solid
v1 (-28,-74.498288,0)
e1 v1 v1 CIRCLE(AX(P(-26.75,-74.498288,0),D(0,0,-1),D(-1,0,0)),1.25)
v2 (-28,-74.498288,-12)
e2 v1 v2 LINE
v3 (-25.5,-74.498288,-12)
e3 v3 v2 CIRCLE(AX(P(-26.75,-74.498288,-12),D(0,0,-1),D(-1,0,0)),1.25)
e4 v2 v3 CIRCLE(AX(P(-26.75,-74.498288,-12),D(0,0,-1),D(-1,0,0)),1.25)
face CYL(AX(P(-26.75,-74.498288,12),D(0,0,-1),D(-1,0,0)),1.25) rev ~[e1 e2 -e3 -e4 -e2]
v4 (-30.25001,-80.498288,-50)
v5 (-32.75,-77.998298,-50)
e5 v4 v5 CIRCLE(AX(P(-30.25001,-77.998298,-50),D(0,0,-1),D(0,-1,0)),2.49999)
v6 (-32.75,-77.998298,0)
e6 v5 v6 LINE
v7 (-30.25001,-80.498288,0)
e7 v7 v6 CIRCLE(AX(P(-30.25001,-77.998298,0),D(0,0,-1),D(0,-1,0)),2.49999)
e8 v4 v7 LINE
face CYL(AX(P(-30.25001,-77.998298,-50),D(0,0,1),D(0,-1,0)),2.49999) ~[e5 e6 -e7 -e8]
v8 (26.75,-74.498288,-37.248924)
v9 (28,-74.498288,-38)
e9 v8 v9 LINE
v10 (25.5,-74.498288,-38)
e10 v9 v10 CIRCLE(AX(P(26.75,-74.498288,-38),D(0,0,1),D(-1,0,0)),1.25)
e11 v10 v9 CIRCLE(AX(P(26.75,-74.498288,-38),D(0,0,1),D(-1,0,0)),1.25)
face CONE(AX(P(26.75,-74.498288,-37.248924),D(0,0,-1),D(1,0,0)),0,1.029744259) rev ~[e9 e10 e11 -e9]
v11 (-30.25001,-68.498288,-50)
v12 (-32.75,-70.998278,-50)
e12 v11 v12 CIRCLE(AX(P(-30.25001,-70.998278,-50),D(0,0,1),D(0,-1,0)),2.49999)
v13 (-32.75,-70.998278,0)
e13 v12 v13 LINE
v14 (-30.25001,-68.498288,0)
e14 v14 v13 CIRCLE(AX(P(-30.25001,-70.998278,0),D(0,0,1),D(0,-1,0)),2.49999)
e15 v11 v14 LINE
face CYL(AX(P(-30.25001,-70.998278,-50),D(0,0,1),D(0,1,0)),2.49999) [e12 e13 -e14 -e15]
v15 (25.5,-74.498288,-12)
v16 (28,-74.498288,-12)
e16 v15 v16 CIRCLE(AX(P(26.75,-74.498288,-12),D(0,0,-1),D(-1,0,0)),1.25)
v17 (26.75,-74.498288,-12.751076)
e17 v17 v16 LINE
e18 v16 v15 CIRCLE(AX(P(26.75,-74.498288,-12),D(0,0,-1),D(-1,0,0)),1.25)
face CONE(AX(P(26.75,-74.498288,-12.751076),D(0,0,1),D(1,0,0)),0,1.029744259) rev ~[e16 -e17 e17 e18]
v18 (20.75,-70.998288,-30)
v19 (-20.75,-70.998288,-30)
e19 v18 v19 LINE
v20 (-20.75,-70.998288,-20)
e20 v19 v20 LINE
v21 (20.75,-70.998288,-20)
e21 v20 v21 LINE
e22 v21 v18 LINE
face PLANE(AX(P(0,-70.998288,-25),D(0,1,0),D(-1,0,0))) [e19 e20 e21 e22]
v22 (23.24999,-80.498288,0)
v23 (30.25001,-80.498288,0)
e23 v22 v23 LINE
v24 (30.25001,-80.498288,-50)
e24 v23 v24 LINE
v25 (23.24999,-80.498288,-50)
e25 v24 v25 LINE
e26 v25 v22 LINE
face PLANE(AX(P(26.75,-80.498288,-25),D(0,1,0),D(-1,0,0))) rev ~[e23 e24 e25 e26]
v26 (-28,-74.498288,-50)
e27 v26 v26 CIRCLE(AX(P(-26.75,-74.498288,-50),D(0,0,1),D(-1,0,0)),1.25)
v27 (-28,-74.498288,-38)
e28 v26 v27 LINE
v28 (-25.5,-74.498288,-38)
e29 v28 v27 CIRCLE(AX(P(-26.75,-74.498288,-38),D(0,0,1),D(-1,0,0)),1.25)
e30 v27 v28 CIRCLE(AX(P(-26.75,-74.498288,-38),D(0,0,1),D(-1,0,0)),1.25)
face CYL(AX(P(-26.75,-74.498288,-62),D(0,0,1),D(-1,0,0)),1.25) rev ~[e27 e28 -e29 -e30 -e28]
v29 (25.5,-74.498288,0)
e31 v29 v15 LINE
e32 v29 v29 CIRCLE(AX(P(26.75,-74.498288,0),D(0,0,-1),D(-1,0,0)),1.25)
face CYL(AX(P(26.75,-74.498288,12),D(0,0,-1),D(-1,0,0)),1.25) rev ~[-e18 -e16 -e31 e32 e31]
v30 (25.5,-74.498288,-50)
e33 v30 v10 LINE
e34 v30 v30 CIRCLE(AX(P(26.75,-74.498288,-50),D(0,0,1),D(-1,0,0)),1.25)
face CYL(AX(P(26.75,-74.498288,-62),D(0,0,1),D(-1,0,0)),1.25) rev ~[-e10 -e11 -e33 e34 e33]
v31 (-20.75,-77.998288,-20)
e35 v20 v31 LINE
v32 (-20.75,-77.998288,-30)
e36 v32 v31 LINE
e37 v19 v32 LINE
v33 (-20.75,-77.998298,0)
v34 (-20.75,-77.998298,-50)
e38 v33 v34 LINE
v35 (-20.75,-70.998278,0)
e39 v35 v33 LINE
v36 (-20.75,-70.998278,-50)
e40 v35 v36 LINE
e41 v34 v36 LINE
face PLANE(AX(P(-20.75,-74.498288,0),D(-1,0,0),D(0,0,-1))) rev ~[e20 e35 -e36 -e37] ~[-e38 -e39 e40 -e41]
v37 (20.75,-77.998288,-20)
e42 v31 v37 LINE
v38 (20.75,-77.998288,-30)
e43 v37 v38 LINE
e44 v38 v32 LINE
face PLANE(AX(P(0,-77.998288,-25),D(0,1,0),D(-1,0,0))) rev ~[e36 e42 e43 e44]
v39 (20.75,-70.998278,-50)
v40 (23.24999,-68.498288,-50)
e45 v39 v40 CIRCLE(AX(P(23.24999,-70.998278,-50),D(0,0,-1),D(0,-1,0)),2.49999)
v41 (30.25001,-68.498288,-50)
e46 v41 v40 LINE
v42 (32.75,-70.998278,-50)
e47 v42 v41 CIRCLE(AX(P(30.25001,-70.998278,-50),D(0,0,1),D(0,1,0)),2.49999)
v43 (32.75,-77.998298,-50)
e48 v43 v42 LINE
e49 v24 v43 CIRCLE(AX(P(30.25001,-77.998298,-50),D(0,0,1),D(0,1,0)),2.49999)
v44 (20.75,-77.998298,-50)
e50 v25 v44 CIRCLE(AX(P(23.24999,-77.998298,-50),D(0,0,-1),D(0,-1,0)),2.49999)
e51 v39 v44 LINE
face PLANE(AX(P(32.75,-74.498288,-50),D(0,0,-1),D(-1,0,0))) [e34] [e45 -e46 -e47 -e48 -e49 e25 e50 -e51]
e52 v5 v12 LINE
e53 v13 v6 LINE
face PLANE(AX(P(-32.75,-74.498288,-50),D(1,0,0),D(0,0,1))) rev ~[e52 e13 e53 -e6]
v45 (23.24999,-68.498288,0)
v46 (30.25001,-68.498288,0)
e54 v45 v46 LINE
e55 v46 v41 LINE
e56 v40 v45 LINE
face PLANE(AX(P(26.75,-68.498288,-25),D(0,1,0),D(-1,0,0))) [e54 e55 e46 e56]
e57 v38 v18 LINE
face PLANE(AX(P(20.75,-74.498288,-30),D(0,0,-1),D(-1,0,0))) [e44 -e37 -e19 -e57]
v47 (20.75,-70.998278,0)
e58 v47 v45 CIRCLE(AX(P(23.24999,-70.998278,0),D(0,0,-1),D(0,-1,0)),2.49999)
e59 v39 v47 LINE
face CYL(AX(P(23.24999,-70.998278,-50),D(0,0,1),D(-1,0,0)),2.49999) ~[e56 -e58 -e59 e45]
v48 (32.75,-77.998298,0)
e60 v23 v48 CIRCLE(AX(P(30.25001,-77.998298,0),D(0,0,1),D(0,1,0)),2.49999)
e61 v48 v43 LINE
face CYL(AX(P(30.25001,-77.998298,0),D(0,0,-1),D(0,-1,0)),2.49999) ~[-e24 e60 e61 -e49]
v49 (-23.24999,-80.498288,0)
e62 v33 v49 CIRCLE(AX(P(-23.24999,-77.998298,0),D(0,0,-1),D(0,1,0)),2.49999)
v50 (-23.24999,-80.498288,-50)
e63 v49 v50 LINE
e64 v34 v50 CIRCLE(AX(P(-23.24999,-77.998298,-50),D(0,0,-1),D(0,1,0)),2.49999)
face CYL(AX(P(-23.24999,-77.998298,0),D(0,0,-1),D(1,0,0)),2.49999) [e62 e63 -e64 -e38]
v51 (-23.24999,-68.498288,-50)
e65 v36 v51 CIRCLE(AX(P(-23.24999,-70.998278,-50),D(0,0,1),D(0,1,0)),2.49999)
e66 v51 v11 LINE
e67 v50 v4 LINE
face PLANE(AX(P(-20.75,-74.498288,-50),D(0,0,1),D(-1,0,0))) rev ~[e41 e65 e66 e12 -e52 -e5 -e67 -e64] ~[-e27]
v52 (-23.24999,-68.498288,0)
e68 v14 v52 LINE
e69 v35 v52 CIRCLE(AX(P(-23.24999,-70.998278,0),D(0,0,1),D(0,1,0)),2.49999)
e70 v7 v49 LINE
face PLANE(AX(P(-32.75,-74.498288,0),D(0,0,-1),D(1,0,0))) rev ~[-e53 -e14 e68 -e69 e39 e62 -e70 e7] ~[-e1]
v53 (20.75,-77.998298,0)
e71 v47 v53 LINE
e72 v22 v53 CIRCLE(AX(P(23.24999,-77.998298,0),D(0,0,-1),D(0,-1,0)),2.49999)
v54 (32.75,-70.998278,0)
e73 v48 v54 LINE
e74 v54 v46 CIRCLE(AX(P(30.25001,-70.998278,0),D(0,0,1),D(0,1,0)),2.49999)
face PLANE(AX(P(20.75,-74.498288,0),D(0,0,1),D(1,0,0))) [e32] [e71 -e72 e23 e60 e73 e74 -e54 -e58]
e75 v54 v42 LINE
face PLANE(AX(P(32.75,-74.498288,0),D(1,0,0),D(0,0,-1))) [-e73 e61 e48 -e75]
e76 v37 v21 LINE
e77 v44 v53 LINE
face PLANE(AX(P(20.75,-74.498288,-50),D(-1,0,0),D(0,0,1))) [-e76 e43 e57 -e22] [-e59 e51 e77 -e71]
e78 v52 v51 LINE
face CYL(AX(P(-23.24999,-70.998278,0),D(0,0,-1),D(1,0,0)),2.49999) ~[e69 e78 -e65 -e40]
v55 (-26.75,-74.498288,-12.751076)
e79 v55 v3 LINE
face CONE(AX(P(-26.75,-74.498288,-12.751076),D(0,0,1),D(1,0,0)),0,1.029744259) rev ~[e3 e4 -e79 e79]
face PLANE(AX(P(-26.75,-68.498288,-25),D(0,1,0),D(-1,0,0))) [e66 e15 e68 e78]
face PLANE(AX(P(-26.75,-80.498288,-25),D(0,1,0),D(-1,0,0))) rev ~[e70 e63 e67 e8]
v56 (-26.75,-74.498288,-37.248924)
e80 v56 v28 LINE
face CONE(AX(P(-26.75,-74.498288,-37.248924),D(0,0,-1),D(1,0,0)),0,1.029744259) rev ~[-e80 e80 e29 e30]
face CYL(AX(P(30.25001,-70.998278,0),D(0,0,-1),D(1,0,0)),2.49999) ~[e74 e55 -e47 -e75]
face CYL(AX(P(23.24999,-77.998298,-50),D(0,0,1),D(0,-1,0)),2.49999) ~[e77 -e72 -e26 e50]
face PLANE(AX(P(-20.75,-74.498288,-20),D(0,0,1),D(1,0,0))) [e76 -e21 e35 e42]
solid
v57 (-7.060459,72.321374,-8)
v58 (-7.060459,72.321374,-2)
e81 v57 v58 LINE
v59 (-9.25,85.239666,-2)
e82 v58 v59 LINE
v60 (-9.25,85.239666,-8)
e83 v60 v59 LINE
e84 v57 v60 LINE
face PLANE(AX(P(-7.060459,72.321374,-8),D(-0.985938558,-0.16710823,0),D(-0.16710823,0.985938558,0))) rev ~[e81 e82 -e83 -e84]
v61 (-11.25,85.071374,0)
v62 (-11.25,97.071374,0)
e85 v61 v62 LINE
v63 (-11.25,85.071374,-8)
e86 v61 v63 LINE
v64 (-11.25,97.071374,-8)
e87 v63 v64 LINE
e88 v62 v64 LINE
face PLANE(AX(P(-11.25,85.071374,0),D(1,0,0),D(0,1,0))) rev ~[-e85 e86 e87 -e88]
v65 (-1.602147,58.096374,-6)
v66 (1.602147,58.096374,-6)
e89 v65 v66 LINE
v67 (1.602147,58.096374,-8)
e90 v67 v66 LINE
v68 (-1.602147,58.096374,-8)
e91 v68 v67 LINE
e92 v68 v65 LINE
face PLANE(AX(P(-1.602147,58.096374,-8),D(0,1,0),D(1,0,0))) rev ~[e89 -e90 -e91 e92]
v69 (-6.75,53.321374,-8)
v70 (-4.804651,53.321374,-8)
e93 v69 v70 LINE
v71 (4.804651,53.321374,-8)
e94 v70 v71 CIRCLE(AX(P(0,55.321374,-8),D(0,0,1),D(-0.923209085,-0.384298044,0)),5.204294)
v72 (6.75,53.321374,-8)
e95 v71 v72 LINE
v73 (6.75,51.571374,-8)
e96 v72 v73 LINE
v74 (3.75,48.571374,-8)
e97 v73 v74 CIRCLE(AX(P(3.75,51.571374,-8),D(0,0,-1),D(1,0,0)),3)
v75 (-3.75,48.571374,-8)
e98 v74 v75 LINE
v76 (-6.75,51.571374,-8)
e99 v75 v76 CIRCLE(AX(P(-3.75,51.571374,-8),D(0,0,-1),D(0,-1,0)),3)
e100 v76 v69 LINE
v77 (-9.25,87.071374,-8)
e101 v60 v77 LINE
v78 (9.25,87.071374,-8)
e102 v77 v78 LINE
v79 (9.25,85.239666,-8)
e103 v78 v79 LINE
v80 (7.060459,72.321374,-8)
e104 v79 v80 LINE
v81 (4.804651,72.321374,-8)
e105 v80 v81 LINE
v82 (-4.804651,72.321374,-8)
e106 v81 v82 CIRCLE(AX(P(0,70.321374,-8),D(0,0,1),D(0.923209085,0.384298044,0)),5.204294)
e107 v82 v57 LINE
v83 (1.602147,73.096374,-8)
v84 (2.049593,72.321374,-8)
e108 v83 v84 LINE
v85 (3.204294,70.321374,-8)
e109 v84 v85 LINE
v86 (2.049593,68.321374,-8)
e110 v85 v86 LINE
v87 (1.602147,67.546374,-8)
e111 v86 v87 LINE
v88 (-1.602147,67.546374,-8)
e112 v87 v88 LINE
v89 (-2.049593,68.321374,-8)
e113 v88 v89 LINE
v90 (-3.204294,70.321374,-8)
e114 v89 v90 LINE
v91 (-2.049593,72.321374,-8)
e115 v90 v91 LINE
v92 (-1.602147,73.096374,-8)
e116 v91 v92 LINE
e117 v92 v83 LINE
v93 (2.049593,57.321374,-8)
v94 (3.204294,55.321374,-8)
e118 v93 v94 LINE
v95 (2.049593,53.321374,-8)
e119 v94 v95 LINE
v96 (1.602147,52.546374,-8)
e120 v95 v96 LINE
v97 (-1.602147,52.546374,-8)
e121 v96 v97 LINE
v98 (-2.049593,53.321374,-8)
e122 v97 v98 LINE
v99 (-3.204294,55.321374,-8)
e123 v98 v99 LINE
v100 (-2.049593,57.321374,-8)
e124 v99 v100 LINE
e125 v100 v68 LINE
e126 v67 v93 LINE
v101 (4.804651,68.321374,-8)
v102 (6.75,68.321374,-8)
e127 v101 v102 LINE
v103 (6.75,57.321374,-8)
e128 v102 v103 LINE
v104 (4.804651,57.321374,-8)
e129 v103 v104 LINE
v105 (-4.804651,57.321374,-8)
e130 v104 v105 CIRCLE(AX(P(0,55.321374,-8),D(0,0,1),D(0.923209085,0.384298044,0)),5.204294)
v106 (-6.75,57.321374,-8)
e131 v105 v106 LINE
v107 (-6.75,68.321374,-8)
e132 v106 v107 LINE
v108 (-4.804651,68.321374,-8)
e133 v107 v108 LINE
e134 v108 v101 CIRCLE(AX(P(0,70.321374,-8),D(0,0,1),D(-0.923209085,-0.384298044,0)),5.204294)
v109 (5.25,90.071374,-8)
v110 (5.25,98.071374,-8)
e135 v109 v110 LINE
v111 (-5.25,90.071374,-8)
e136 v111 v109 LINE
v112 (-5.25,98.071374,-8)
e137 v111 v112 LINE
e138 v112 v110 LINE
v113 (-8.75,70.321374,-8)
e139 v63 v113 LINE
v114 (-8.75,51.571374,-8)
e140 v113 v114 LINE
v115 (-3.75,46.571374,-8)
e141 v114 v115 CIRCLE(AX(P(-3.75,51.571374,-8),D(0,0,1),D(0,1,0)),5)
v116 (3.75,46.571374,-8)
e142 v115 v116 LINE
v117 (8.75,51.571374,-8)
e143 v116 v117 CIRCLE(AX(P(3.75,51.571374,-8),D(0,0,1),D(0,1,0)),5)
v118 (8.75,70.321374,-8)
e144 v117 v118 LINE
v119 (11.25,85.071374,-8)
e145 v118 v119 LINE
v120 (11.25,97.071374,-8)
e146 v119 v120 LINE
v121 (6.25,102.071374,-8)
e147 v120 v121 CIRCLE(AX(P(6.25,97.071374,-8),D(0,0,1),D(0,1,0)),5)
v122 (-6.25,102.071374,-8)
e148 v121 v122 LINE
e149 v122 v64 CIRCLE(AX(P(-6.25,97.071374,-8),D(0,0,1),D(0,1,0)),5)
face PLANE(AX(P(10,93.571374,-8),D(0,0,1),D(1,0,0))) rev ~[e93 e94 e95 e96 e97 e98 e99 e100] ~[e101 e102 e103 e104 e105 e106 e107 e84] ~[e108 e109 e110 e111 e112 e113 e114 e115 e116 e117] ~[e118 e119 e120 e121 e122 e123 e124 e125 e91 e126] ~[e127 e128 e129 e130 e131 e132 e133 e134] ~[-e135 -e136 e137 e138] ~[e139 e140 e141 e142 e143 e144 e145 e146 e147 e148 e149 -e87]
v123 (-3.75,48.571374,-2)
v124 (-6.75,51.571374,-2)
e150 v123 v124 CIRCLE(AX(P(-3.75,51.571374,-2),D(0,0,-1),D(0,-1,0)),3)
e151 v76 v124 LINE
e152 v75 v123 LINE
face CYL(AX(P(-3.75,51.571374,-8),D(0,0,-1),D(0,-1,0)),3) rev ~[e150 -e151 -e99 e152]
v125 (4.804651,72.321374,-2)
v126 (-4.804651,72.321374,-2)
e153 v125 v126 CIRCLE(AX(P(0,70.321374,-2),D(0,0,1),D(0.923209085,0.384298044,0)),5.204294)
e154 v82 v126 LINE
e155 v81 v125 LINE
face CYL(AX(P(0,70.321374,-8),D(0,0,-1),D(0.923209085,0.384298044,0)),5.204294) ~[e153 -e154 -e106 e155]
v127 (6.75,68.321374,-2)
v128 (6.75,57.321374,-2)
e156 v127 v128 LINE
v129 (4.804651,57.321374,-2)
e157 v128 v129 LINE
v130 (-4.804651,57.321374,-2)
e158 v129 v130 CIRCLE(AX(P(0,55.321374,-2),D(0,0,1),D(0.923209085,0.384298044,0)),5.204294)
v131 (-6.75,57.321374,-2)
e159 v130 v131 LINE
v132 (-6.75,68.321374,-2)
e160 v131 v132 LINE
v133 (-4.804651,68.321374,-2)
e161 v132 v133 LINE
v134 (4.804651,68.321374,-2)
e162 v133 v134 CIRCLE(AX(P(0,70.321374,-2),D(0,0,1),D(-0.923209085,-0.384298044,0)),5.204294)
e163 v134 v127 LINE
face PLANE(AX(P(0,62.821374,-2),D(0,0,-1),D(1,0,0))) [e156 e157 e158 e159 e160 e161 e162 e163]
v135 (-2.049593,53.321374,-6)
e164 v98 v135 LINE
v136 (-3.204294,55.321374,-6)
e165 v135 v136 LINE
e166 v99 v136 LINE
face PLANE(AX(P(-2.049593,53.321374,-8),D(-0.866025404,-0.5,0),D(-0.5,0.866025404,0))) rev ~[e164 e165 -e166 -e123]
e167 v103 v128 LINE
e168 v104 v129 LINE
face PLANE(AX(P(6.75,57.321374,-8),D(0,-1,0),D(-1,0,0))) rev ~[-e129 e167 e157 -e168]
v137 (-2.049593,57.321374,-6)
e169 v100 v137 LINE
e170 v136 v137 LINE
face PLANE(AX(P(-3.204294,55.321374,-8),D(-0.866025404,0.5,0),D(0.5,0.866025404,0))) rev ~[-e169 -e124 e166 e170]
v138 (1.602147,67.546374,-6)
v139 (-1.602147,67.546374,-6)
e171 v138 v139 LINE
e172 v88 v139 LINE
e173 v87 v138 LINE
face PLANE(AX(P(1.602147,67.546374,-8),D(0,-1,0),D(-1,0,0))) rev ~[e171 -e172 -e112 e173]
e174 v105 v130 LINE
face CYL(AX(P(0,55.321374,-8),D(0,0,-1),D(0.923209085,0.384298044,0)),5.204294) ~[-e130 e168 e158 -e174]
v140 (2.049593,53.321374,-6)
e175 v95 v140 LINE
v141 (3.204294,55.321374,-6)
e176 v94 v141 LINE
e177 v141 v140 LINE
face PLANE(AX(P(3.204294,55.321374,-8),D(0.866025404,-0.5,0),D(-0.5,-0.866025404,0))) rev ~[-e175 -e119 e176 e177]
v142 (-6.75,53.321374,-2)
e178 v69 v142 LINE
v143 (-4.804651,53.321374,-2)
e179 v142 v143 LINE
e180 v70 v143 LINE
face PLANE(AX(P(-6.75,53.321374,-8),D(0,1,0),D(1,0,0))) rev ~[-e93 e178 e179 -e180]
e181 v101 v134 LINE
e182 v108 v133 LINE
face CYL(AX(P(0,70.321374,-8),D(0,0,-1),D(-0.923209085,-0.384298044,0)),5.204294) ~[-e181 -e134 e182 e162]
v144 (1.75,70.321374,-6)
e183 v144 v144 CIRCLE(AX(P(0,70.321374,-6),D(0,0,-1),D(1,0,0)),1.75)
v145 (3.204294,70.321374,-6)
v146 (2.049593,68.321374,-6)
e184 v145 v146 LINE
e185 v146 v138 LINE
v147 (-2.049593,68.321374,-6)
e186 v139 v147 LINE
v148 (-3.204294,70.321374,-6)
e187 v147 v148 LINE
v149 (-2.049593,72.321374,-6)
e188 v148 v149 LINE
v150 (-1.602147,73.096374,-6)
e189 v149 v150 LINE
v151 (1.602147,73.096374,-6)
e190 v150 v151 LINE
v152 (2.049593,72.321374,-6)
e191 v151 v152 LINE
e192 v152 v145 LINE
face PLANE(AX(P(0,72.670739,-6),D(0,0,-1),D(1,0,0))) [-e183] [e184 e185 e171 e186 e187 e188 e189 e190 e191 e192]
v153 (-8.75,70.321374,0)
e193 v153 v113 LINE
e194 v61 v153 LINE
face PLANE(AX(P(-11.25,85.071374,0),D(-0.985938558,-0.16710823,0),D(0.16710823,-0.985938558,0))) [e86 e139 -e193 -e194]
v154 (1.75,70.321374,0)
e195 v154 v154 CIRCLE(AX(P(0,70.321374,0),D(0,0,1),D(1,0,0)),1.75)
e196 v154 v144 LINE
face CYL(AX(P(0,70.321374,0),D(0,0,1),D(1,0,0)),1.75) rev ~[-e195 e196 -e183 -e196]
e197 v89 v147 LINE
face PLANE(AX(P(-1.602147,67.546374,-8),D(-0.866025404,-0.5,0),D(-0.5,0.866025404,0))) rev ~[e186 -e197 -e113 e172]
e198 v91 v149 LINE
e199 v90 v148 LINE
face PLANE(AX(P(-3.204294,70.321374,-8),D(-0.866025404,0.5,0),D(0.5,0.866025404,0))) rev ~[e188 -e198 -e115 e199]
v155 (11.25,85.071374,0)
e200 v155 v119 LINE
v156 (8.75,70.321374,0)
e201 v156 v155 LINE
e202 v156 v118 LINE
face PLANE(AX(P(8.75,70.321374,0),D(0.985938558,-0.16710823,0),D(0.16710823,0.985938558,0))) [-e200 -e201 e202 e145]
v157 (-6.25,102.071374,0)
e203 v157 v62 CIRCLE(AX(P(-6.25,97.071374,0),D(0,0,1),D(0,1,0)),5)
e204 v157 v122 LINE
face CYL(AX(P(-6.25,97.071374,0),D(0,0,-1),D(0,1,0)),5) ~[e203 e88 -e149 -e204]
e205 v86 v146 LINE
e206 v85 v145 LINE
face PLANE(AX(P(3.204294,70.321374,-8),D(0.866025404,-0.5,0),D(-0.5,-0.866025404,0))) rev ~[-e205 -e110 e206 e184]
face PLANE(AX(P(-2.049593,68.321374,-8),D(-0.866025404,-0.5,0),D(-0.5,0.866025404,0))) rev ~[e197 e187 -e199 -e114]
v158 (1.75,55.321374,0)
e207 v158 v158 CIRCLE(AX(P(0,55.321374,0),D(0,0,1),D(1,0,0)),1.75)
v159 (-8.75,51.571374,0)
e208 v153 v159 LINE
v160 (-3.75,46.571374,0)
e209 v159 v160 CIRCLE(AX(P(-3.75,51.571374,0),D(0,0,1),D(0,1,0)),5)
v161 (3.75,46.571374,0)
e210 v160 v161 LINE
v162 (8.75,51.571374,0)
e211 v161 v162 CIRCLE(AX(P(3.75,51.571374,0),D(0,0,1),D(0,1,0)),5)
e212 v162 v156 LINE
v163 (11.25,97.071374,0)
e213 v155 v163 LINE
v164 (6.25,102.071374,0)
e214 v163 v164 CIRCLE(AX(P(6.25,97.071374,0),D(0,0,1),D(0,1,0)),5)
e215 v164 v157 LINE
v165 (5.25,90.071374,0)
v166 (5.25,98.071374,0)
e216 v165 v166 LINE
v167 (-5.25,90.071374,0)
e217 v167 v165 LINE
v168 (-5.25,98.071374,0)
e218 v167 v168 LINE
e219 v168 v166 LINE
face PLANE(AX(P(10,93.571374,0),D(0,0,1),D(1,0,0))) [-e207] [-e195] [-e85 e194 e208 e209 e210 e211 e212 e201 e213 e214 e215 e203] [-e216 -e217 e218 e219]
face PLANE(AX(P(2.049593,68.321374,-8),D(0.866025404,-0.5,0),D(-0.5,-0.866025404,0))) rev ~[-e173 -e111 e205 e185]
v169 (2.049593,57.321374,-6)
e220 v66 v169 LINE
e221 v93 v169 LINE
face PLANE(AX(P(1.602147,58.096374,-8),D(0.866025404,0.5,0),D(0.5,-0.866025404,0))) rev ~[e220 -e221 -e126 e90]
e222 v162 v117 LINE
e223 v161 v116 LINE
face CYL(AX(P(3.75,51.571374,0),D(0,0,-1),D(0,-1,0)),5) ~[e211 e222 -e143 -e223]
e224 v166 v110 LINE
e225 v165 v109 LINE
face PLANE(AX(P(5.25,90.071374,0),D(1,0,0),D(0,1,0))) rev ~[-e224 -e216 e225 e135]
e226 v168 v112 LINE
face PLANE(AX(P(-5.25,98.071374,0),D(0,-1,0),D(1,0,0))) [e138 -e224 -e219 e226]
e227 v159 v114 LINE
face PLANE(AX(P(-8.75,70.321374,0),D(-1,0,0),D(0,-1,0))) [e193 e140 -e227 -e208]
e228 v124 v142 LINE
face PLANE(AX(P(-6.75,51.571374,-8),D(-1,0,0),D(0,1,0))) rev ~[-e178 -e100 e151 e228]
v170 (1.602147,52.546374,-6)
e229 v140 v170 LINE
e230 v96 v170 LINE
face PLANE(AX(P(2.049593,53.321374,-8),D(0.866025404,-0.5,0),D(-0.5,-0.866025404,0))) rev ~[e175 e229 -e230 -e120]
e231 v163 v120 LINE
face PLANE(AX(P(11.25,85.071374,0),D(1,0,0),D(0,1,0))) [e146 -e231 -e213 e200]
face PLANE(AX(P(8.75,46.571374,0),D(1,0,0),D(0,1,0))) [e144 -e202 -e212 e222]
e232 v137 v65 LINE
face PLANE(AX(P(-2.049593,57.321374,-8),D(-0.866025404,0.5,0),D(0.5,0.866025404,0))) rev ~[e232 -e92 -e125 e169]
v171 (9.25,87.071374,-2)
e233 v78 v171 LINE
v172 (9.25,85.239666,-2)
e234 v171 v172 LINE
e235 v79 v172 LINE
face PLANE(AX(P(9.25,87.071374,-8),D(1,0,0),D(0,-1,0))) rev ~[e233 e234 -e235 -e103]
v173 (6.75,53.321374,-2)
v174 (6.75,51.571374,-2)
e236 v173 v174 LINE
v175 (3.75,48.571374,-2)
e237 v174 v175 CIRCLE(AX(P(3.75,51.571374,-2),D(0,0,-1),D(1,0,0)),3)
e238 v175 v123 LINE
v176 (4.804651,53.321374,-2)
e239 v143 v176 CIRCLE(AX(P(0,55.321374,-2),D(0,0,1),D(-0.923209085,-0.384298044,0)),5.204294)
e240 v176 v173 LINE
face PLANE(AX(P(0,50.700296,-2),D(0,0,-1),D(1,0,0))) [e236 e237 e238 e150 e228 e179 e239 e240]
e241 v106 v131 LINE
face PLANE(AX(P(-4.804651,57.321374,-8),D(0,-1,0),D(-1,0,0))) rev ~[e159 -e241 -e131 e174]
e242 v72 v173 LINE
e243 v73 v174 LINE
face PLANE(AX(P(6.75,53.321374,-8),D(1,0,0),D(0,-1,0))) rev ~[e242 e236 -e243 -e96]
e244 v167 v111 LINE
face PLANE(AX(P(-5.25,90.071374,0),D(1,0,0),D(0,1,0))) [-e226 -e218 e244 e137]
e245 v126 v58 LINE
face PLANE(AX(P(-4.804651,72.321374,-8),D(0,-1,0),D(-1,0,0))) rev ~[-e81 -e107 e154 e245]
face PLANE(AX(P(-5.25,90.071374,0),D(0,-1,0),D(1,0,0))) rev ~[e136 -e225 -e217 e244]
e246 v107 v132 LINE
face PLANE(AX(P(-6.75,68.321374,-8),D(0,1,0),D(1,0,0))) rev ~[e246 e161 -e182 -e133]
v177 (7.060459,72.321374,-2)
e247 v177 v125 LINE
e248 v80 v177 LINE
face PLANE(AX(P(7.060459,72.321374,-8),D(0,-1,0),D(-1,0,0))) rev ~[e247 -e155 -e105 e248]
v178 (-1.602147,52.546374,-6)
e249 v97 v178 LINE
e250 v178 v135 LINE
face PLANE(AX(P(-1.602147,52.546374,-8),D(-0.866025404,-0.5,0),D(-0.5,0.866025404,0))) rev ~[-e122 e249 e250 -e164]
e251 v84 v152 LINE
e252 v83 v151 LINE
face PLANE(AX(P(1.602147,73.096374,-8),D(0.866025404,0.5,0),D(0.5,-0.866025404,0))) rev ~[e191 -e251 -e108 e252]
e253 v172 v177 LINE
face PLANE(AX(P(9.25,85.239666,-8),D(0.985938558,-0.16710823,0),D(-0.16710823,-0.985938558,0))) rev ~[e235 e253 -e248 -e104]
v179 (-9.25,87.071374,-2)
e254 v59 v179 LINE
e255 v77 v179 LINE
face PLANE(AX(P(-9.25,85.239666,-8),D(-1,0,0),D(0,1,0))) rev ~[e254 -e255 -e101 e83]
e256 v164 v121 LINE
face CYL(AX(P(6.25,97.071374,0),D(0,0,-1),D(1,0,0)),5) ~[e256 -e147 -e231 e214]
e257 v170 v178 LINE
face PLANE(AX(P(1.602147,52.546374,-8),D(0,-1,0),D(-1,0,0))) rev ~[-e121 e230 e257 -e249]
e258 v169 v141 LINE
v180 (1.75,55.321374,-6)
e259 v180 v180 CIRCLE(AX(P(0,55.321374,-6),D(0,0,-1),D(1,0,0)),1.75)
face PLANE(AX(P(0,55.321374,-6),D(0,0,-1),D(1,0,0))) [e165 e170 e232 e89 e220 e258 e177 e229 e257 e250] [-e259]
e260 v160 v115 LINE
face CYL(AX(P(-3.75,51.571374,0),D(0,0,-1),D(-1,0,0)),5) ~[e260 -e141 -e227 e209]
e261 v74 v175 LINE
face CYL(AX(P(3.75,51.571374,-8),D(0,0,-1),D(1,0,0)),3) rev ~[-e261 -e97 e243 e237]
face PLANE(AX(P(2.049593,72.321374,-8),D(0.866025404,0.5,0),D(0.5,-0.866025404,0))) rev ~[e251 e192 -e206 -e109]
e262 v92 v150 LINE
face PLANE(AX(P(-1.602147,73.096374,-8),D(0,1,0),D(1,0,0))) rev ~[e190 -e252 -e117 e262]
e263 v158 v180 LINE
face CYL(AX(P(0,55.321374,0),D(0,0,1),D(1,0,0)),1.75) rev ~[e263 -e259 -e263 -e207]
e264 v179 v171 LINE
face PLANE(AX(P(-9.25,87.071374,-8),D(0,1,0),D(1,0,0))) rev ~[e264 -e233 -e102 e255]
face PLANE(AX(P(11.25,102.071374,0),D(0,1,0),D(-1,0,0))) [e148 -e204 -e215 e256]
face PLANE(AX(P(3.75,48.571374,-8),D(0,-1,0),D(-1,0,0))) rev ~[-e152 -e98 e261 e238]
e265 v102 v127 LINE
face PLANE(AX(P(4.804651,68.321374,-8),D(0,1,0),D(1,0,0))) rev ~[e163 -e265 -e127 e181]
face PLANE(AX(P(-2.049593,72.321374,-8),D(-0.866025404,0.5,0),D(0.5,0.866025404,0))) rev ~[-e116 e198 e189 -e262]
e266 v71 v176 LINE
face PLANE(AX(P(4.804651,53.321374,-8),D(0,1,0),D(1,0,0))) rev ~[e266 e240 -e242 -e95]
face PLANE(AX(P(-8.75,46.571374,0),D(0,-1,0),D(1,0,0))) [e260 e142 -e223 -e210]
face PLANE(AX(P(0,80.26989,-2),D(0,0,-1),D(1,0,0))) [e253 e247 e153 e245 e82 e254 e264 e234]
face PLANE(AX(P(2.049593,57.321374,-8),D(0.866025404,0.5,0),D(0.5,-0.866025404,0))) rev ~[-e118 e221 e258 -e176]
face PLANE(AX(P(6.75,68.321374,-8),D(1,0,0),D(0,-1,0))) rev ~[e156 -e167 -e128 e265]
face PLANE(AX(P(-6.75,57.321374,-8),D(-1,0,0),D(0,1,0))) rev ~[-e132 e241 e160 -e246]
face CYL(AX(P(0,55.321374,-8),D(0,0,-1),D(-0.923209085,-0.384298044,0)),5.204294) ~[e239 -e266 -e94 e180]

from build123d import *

# Parameters (mm, degrees)
F7_W      = 2.5
F7_H      = 17
F7_W_2    = 17.5
F7_W_3    = 10.5
F7_H_2    = 8
F7_R      = 1.75
F8_DEPTH  = 8
F9_R      = 5
F11_DEPTH = 6
F10_R     = 1.75
F12_DEPTH = 2
F15_DEPTH = 3.5
F16_DEPTH = 6
F18_D     = 2.5
F18_DEPTH = 12
F18_TIP   = 0.7510757738
F20_D     = 2.5
F20_DEPTH = 12
F20_TIP   = 0.7510757738
F21_R     = 2.49999


# Not quite as in the source:
# - a fillet or chamfer is up to 0.001 mm smaller than in the source, because OpenCascade refuses the exact size


with BuildPart() as f8:
    # F7 (on Top) → F8 (new body)
    with BuildSketch(Plane.XY):
        with Locations((10, 93.5713741661)):
            Rectangle(F7_W, F7_H)
        with Locations((0, 93.5713741661)):
            Rectangle(F7_W_2, F7_H)
        with Locations((0, 94.0713741661)):
            Rectangle(F7_W_3, F7_H_2, mode=Mode.SUBTRACT)
        with Locations((-10, 93.5713741661)):
            Rectangle(F7_W, F7_H)
        Polygon((-11.25, 85.0713741661), (-8.75, 70.3213741661), (-8.75, 85.0713741661), align=None)
        Polygon((-8.75, 46.5713741661), (8.75, 46.5713741661), (8.75, 70.3213741661), (8.75, 85.0713741661), (-8.75, 85.0713741661), (-8.75, 70.3213741661), align=None)
        with Locations((0, 55.3213741661)):
            Circle(F7_R, mode=Mode.SUBTRACT)
        with Locations((0, 70.3213741661)):
            Circle(F7_R, mode=Mode.SUBTRACT)
        Polygon((8.75, 85.0713741661), (8.75, 70.3213741661), (11.25, 85.0713741661), align=None)
    extrude(amount=-F8_DEPTH)

    # F9
    f9_edges = [f8.edges().sort_by_distance(p)[0] for p in [
        (11.25, 102.071374, -4),
        (8.75, 46.571374, -4),
        (-8.75, 46.571374, -4),
        (-11.25, 102.071374, -4),
    ]]
    fillet(f9_edges, radius=F9_R)

    # F10 (on face) → F11 (cut)
    with BuildSketch(Plane(origin=(0, 0, -8), x_dir=(1, 0, 0), z_dir=(0, 0, -1))):
        with BuildLine():
            Line((6.75, -57.3213741661), (4.8046514937, -57.3213741661))
            ThreePointArc((4.8046514937, -57.3213741661), (0, -60.5256681601), (-4.8046514937, -57.3213741661))
            Line((-4.8046514937, -57.3213741661), (-6.75, -57.3213741661))
            Line((-6.75, -57.3213741661), (-6.75, -68.3213741661))
            Line((-6.75, -68.3213741661), (-4.8046514937, -68.3213741661))
            ThreePointArc((-4.8046514937, -68.3213741661), (0, -65.1170801721), (4.8046514937, -68.3213741661))
            Line((4.8046514937, -68.3213741661), (6.75, -68.3213741661))
            Line((6.75, -68.3213741661), (6.75, -57.3213741661))
        make_face()
        with BuildLine():
            Line((-6.75, -53.3213741661), (-4.8046514937, -53.3213741661))
            ThreePointArc((-4.8046514937, -53.3213741661), (0, -50.1170801721), (4.8046514937, -53.3213741661))
            Line((4.8046514937, -53.3213741661), (6.75, -53.3213741661))
            Line((6.75, -53.3213741661), (6.75, -51.5713741661))
            ThreePointArc((6.75, -51.5713741661), (5.8713203436, -49.4500538226), (3.75, -48.5713741661))
            Line((3.75, -48.5713741661), (-3.75, -48.5713741661))
            ThreePointArc((-3.75, -48.5713741661), (-5.8713203436, -49.4500538226), (-6.75, -51.5713741661))
            Line((-6.75, -51.5713741661), (-6.75, -53.3213741661))
        make_face()
        with BuildLine():
            Line((9.25, -85.2396656064), (7.0604590779, -72.3213741661))
            Line((7.0604590779, -72.3213741661), (4.8046514937, -72.3213741661))
            ThreePointArc((4.8046514937, -72.3213741661), (0, -75.5256681601), (-4.8046514937, -72.3213741661))
            Line((-4.8046514937, -72.3213741661), (-7.0604590779, -72.3213741661))
            Line((-7.0604590779, -72.3213741661), (-9.25, -85.2396656064))
            Line((-9.25, -85.2396656064), (-9.25, -87.0713741661))
            Line((-9.25, -87.0713741661), (9.25, -87.0713741661))
            Line((9.25, -87.0713741661), (9.25, -85.2396656064))
        make_face()
    extrude(amount=-F11_DEPTH, mode=Mode.SUBTRACT)

    # F10 (on face) → F12 (cut)
    with BuildSketch(Plane(origin=(0, 0, -8), x_dir=(1, 0, 0), z_dir=(0, 0, -1))):
        Polygon((-2.0495934556, -57.3213741661), (2.0495934556, -57.3213741661), (3.204293994, -55.3213741661), (2.0495934556, -53.3213741661), (-2.0495934556, -53.3213741661), (-3.204293994, -55.3213741661), align=None)
        with Locations((0, -55.3213741661)):
            Circle(F10_R, mode=Mode.SUBTRACT)
        Polygon((-1.602146997, -58.0963741661), (1.602146997, -58.0963741661), (2.0495934556, -57.3213741661), (-2.0495934556, -57.3213741661), align=None)
        Polygon((-2.0495934556, -53.3213741661), (2.0495934556, -53.3213741661), (1.602146997, -52.5463741661), (-1.602146997, -52.5463741661), align=None)
        Polygon((2.0495934556, -72.3213741661), (-2.0495934556, -72.3213741661), (-1.602146997, -73.0963741661), (1.602146997, -73.0963741661), align=None)
        Polygon((3.204293994, -70.3213741661), (2.0495934556, -68.3213741661), (-2.0495934556, -68.3213741661), (-3.204293994, -70.3213741661), (-2.0495934556, -72.3213741661), (2.0495934556, -72.3213741661), align=None)
        with Locations((0, -70.3213741661)):
            Circle(F10_R, mode=Mode.SUBTRACT)
        Polygon((-2.0495934556, -68.3213741661), (2.0495934556, -68.3213741661), (1.602146997, -67.5463741661), (-1.602146997, -67.5463741661), align=None)
    extrude(amount=-F12_DEPTH, mode=Mode.SUBTRACT)


with BuildPart() as f15:
    # F14 (on line) → F15 (new body, symmetric)
    with BuildSketch(Plane(origin=(0, -74.4982883334, 0), x_dir=(-1, 0, 0), z_dir=(0, 1, 0))):
        Polygon((20.75, -20), (0, -20), (-20.75, -20), (-20.75, -30), (0, -30), (20.75, -30), align=None)
    extrude(amount=F15_DEPTH, both=True)

    # F14 (on line) → F16 (join, symmetric)
    with BuildSketch(Plane(origin=(0, -74.4982883334, 0), x_dir=(-1, 0, 0), z_dir=(0, 1, 0))):
        Polygon((20.75, 0), (20.75, -20), (20.75, -30), (20.75, -50), (32.75, -50), (32.75, -25), (32.75, 0), align=None)
        Polygon((-20.75, -30), (-20.75, -20), (-20.75, 0), (-32.75, 0), (-32.75, -25), (-32.75, -50), (-20.75, -50), align=None)
    extrude(amount=F16_DEPTH, both=True)

    # F18
    with Locations(Plane.XY):
        with Locations((-26.75, -74.4982883334), (26.75, -74.4982883334)):
            Hole(F18_D / 2, depth=F18_DEPTH)
            with Locations((0, 0, -(F18_DEPTH + F18_TIP / 2))):  # 118° drill point
                Cone(0, F18_D / 2, F18_TIP, mode=Mode.SUBTRACT)

    # F20
    with Locations(Plane(origin=(0, 0, -50), x_dir=(1, 0, 0), z_dir=(0, 0, -1))):
        with Locations((-26.75, 74.4982883334), (26.75, 74.4982883334)):
            Hole(F20_D / 2, depth=F20_DEPTH)
            with Locations((0, 0, -(F20_DEPTH + F20_TIP / 2))):  # 118° drill point
                Cone(0, F20_D / 2, F20_TIP, mode=Mode.SUBTRACT)

    # F21 (radius 2.5 in the source; OpenCascade refuses exactly that, so slightly less here)
    f21_edges = [f15.edges().sort_by_distance(p)[0] for p in [
        (-20.75, -80.498288, -25),
        (-20.75, -68.498288, -25),
        (-32.75, -80.498288, -25),
        (20.75, -80.498288, -25),
        (32.75, -80.498288, -25),
        (32.75, -68.498288, -25),
        (-32.75, -68.498288, -25),
        (20.75, -68.498288, -25),
    ]]
    fillet(f21_edges, radius=F21_R)


solid = Compound([f8.part, f15.part])
